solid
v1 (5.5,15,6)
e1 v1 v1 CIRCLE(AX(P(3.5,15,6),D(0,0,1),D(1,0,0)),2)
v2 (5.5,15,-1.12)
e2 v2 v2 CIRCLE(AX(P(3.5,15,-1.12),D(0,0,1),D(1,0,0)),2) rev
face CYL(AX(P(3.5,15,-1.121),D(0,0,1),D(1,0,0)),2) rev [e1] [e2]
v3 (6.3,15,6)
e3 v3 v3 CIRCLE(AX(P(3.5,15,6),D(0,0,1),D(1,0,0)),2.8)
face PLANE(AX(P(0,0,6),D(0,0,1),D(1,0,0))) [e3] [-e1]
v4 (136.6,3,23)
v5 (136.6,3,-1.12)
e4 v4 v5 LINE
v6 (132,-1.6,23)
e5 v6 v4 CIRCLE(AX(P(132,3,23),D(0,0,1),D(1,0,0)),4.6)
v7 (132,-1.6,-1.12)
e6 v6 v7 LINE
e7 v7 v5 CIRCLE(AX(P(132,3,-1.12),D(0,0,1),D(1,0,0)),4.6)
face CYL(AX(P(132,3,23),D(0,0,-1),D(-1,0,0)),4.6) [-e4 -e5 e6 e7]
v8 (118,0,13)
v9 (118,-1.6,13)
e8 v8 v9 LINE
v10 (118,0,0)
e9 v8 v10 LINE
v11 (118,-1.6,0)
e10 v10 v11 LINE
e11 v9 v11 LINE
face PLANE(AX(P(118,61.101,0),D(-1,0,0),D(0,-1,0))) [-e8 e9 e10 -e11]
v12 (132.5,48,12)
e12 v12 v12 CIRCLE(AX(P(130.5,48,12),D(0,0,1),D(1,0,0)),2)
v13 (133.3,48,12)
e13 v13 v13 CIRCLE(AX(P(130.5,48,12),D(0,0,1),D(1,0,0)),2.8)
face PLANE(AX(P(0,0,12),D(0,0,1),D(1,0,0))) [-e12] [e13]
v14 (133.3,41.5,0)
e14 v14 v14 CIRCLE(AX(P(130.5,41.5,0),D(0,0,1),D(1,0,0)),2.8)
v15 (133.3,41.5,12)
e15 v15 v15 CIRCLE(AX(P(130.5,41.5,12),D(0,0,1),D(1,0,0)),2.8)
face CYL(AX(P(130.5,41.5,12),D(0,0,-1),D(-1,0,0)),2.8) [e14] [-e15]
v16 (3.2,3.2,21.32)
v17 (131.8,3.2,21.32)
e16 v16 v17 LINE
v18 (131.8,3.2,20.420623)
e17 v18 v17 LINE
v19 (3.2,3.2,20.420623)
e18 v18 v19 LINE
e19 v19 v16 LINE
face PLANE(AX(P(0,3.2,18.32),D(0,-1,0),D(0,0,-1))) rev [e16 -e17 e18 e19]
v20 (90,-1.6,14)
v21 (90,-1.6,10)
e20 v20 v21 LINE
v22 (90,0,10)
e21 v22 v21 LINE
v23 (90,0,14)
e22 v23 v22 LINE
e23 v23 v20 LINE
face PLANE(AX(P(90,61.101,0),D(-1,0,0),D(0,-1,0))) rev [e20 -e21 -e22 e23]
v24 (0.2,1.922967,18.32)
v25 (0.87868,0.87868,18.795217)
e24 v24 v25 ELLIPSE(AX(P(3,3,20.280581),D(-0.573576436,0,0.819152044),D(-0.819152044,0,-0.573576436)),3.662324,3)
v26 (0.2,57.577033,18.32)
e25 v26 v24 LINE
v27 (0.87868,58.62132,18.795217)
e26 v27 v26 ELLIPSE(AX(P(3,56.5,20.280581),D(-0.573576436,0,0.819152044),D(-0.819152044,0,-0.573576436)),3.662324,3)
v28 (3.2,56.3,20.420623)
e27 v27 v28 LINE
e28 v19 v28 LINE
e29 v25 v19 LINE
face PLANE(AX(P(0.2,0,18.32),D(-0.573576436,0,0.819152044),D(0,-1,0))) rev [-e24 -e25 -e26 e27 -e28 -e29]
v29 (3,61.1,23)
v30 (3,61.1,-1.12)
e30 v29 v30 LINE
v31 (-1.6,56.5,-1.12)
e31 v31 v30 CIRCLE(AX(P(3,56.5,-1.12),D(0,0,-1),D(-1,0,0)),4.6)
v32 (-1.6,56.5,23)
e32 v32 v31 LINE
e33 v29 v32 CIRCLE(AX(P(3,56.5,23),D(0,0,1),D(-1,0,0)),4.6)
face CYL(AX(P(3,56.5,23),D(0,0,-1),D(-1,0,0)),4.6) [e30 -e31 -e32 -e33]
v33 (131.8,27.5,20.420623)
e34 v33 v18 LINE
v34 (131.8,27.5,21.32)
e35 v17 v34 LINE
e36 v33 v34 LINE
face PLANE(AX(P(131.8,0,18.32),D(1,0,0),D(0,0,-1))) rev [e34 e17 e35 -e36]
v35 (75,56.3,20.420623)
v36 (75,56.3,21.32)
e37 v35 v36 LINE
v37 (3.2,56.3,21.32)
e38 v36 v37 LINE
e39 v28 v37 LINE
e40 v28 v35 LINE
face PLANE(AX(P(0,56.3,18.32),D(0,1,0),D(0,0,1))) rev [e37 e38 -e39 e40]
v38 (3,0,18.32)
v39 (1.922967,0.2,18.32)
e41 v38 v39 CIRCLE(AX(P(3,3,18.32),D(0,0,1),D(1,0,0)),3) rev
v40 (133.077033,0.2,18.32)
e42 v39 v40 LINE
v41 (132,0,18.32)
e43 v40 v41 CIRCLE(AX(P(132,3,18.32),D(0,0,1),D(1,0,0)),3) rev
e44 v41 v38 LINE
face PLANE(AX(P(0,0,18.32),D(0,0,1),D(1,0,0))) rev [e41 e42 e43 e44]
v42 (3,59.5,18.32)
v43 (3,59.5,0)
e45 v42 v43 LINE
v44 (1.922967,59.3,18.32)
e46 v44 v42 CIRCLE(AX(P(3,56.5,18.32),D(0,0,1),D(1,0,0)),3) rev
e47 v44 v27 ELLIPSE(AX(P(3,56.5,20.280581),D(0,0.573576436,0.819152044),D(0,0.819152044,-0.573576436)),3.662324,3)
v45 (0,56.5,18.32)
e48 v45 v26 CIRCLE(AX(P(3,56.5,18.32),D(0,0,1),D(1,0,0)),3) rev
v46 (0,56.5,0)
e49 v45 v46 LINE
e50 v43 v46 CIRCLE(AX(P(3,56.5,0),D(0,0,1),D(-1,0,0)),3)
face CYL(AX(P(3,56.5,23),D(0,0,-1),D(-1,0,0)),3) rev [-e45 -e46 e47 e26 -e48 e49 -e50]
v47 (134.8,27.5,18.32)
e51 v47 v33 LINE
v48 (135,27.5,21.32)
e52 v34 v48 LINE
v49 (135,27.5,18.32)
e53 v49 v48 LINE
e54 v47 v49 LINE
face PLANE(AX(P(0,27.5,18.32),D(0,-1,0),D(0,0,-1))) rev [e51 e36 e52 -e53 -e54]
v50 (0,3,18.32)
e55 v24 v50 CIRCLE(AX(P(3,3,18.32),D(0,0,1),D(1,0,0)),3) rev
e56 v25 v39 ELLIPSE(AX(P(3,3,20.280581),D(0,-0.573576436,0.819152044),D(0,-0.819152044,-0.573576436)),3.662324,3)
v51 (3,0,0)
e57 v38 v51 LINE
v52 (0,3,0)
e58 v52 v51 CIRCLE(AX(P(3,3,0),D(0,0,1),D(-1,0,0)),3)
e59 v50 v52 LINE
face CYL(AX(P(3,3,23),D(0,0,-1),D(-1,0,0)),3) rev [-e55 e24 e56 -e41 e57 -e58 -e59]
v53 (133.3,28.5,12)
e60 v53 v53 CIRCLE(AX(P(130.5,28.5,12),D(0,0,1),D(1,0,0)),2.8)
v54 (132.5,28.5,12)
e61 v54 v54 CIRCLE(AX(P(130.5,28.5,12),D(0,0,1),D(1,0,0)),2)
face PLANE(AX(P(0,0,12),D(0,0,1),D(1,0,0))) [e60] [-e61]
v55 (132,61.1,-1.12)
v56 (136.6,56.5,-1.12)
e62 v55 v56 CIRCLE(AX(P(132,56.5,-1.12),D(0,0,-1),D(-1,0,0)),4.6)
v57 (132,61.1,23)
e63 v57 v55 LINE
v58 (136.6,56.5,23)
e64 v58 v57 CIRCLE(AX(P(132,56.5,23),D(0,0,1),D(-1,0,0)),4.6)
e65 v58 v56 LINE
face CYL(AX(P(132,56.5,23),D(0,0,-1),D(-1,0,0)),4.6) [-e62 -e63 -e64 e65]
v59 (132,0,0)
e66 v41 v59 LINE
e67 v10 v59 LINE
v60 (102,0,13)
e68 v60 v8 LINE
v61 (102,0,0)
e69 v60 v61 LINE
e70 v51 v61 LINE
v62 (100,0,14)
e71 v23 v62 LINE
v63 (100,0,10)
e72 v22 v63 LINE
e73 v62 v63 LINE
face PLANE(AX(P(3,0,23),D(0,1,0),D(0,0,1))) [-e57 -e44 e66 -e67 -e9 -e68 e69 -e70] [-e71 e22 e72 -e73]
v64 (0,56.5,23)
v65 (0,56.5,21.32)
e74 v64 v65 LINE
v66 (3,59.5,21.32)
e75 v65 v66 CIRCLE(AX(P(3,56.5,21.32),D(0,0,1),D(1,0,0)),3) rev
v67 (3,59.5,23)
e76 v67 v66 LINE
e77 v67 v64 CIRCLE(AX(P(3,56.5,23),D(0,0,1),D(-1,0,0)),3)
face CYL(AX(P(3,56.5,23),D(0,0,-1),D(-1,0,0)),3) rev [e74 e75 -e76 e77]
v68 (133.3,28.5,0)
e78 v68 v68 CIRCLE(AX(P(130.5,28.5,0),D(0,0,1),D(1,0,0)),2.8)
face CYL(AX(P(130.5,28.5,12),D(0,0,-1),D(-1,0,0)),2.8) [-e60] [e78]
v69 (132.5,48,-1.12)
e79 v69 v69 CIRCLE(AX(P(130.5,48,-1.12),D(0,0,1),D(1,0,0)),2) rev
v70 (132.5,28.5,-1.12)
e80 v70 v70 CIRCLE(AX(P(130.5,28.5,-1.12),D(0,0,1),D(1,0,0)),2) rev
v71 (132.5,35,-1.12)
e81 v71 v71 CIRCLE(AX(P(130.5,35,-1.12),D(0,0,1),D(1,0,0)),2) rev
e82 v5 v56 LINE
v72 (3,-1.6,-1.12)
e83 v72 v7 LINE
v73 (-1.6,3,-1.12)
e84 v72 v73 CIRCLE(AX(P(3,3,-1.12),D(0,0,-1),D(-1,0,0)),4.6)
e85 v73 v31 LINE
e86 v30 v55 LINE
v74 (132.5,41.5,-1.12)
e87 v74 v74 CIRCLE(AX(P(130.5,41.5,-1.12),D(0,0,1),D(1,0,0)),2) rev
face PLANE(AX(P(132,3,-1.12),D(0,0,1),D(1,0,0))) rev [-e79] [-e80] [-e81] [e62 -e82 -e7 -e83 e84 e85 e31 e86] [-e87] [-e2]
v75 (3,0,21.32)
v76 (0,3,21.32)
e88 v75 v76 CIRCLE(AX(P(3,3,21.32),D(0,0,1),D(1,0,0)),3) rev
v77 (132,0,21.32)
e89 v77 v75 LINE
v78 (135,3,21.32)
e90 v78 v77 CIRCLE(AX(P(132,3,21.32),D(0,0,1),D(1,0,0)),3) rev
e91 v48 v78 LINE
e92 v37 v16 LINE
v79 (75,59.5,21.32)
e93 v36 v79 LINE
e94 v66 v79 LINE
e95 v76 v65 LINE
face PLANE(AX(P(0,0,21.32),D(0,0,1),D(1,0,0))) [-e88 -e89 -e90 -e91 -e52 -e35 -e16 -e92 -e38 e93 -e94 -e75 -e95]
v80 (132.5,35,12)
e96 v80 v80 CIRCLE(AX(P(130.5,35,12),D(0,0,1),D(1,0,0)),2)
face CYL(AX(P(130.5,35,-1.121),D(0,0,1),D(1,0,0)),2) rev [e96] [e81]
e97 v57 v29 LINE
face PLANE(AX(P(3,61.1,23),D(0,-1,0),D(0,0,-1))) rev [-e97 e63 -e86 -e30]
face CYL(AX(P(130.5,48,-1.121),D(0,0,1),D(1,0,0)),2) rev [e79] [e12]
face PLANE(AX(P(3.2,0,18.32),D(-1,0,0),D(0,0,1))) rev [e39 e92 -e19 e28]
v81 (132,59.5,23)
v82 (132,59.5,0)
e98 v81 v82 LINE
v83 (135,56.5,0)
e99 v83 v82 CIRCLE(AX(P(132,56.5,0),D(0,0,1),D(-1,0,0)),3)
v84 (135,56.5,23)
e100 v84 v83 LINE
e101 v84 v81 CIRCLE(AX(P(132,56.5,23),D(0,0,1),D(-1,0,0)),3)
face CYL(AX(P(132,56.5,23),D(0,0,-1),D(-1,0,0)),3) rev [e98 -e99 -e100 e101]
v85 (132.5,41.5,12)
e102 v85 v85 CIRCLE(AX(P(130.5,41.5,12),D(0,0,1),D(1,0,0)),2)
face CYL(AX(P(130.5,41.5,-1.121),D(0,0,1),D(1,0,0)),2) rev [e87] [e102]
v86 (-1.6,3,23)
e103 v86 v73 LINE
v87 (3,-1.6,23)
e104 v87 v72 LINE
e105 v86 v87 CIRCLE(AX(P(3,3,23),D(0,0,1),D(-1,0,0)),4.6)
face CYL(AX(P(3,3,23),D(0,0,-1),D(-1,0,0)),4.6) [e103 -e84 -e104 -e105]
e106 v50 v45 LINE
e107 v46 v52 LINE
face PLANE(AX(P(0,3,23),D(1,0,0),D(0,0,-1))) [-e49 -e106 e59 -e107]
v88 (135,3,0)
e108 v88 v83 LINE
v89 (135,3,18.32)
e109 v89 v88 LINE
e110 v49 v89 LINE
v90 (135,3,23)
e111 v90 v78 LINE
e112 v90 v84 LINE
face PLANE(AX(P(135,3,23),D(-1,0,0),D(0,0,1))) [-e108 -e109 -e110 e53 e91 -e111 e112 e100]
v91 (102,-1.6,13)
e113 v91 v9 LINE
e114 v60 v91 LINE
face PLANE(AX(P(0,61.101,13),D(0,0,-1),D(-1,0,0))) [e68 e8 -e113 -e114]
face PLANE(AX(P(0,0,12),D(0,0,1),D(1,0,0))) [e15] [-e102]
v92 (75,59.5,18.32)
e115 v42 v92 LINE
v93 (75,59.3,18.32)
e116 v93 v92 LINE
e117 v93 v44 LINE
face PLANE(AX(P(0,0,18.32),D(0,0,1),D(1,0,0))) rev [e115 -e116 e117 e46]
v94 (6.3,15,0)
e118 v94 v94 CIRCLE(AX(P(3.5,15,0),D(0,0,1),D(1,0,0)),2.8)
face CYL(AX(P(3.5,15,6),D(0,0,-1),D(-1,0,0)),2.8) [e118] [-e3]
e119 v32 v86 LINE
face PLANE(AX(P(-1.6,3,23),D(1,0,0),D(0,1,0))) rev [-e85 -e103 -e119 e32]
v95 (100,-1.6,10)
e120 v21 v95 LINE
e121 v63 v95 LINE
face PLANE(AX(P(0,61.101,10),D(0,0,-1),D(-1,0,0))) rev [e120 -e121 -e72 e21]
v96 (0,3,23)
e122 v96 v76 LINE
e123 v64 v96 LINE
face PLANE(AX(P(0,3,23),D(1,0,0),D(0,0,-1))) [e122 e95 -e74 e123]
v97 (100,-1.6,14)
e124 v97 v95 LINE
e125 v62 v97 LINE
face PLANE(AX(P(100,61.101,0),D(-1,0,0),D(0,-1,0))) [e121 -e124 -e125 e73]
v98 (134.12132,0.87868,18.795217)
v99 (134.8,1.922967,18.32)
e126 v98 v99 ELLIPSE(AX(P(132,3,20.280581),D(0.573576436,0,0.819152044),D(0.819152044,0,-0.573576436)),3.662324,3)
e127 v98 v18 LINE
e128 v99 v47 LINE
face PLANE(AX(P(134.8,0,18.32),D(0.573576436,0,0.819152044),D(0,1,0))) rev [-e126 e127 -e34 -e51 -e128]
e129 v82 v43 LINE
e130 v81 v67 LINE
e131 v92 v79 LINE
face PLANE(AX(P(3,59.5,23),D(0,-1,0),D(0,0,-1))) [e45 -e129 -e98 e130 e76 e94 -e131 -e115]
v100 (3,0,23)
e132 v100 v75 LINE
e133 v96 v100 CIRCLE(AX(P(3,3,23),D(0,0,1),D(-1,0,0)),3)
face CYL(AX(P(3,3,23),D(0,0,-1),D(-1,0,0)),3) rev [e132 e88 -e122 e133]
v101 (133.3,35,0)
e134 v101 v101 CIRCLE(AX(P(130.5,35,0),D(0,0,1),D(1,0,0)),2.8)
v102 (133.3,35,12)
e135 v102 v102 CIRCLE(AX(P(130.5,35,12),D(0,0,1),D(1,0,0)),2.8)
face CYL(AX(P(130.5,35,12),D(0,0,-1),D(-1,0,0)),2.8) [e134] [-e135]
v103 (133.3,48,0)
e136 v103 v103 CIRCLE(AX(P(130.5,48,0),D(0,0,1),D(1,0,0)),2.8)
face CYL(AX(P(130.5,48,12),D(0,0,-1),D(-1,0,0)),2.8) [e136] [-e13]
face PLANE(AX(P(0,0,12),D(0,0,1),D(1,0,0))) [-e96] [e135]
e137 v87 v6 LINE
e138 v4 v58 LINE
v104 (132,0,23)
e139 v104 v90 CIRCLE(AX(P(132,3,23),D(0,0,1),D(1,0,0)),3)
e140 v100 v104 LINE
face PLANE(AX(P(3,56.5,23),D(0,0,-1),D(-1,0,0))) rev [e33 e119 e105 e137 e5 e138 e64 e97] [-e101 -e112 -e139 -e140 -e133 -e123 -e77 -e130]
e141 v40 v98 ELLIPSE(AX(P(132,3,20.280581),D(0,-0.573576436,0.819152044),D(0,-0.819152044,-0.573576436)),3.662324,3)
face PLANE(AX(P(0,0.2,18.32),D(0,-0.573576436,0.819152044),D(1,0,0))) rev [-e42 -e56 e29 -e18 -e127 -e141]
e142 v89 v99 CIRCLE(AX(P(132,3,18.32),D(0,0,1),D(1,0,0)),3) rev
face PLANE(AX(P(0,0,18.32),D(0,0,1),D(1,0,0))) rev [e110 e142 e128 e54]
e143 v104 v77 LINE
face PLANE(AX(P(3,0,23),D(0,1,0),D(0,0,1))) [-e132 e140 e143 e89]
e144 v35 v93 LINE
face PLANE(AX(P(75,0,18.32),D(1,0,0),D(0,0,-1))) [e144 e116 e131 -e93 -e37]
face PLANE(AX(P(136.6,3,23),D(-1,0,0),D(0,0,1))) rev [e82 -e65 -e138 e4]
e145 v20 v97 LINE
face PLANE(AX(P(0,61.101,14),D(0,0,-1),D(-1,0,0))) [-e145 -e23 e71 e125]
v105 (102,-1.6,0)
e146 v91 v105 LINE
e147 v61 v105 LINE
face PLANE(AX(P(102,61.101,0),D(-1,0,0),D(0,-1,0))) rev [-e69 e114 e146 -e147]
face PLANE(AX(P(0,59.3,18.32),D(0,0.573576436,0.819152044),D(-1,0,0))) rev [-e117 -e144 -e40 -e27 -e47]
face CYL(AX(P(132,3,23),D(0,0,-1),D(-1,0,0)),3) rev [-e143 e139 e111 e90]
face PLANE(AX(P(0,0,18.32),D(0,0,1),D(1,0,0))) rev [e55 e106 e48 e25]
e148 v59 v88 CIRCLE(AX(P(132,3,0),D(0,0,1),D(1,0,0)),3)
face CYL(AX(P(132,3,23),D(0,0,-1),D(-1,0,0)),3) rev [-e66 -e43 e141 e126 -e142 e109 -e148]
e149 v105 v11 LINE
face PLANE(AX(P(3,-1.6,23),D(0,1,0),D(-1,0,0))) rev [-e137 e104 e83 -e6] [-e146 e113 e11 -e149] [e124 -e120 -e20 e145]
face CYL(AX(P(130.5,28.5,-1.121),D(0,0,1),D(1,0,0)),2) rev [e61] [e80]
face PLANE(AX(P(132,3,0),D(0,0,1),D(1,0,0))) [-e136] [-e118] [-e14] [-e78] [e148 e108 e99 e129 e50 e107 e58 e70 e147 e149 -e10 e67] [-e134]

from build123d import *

# Parameters (mm, degrees)
PARED_DEPTH             = 23
CONECTORES_REACH        = 154.052
CROQUIS2_W              = 16
CROQUIS2_H              = 13
CROQUIS2_W_2            = 10
CROQUIS2_H_2            = 4
BASE_START              = -1.12
BASE_FRENTE_DEPTH       = 1.12
LUCES_REACH             = 153.399
CROQUIS3_R              = 2
SALIENTE_EXTRUIR1_START = 12
CROQUIS3_3_R            = 2.8
CROQUIS3_3_R_2          = 2
SALIENTE_EXTRUIR1_DEPTH = 12
SALIENTE_EXTRUIR3_START = 6
CROQUIS3_5_R            = 2.8
CROQUIS3_5_R_2          = 2
SALIENTE_EXTRUIR3_DEPTH = 6
SALIENTE_EXTRUIR4_START = -4.68
SALIENTE_EXTRUIR4_DEPTH = 3


with BuildPart() as part:
    # Croquis1 → pared (new body)
    with BuildSketch(Plane.XY):
        with BuildLine():
            Line((3, 61.1), (132, 61.1))
            ThreePointArc((132, 61.1), (135.252691193, 59.752691193), (136.6, 56.5))
            Line((136.6, 56.5), (136.6, 3))
            ThreePointArc((136.6, 3), (135.252691193, -0.252691193), (132, -1.6))
            Line((132, -1.6), (3, -1.6))
            ThreePointArc((3, -1.6), (-0.252691193, -0.252691193), (-1.6, 3))
            Line((-1.6, 3), (-1.6, 56.5))
            ThreePointArc((-1.6, 56.5), (-0.252691193, 59.752691193), (3, 61.1))
        make_face()
        with BuildLine():
            Line((3, 0), (132, 0))
            ThreePointArc((132, 0), (134.121320344, 0.878679656), (135, 3))
            Line((135, 3), (135, 56.5))
            ThreePointArc((135, 56.5), (134.121320344, 58.621320344), (132, 59.5))
            Line((132, 59.5), (3, 59.5))
            ThreePointArc((3, 59.5), (0.878679656, 58.621320344), (0, 56.5))
            Line((0, 56.5), (0, 3))
            ThreePointArc((0, 3), (0.878679656, 0.878679656), (3, 0))
        make_face(mode=Mode.SUBTRACT)
    extrude(amount=PARED_DEPTH)

    # Croquis2 → conectores (cut, up to next)
    with BuildSketch(Plane.XZ.offset(1.6), mode=Mode.PRIVATE) as conectores_sk1:
        with Locations((110, 6.5)):
            Rectangle(CROQUIS2_W, CROQUIS2_H)
    conectores_tool1 = extrude(conectores_sk1.sketch, amount=-CONECTORES_REACH, mode=Mode.PRIVATE) & part.part
    # Croquis2 → conectores (cut, up to next)
    with BuildSketch(Plane.XZ.offset(1.6), mode=Mode.PRIVATE) as conectores_sk2:
        with Locations((95, 12)):
            Rectangle(CROQUIS2_W_2, CROQUIS2_H_2)
    conectores_tool2 = extrude(conectores_sk2.sketch, amount=-CONECTORES_REACH, mode=Mode.PRIVATE) & part.part
    add(conectores_tool1.solids().sort_by_distance((110, -1.6, 6.5))[0], mode=Mode.SUBTRACT)
    add(conectores_tool2.solids().sort_by_distance((95, -1.6, 12))[0], mode=Mode.SUBTRACT)

    # Croquis1<2> → base frente (add)
    with BuildSketch(Plane.XY.offset(BASE_START)):
        with BuildLine():
            Line((3, 61.1), (132, 61.1))
            ThreePointArc((132, 61.1), (135.252691193, 59.752691193), (136.6, 56.5))
            Line((136.6, 56.5), (136.6, 3))
            ThreePointArc((136.6, 3), (135.252691193, -0.252691193), (132, -1.6))
            Line((132, -1.6), (3, -1.6))
            ThreePointArc((3, -1.6), (-0.252691193, -0.252691193), (-1.6, 3))
            Line((-1.6, 3), (-1.6, 56.5))
            ThreePointArc((-1.6, 56.5), (-0.252691193, 59.752691193), (3, 61.1))
        make_face()
    extrude(amount=BASE_FRENTE_DEPTH)

    # Croquis3 → luces (cut, up to next)
    with BuildSketch(Plane.XY, mode=Mode.PRIVATE) as luces_sk1:
        with Locations((130.5, 48)):
            Circle(CROQUIS3_R)
    luces_tool1 = extrude(luces_sk1.sketch, amount=-LUCES_REACH, mode=Mode.PRIVATE) & part.part
    # Croquis3 → luces (cut, up to next)
    with BuildSketch(Plane.XY, mode=Mode.PRIVATE) as luces_sk2:
        with Locations((130.5, 41.5)):
            Circle(CROQUIS3_R)
    luces_tool2 = extrude(luces_sk2.sketch, amount=-LUCES_REACH, mode=Mode.PRIVATE) & part.part
    # Croquis3 → luces (cut, up to next)
    with BuildSketch(Plane.XY, mode=Mode.PRIVATE) as luces_sk3:
        with Locations((130.5, 35)):
            Circle(CROQUIS3_R)
    luces_tool3 = extrude(luces_sk3.sketch, amount=-LUCES_REACH, mode=Mode.PRIVATE) & part.part
    # Croquis3 → luces (cut, up to next)
    with BuildSketch(Plane.XY, mode=Mode.PRIVATE) as luces_sk4:
        with Locations((130.5, 28.5)):
            Circle(CROQUIS3_R)
    luces_tool4 = extrude(luces_sk4.sketch, amount=-LUCES_REACH, mode=Mode.PRIVATE) & part.part
    # Croquis3 → luces (cut, up to next)
    with BuildSketch(Plane.XY, mode=Mode.PRIVATE) as luces_sk5:
        with Locations((3.5, 15)):
            Circle(CROQUIS3_R)
    luces_tool5 = extrude(luces_sk5.sketch, amount=-LUCES_REACH, mode=Mode.PRIVATE) & part.part
    add(luces_tool1.solids().sort_by_distance((130.5, 48, 0))[0], mode=Mode.SUBTRACT)
    add(luces_tool2.solids().sort_by_distance((130.5, 41.5, 0))[0], mode=Mode.SUBTRACT)
    add(luces_tool3.solids().sort_by_distance((130.5, 35, 0))[0], mode=Mode.SUBTRACT)
    add(luces_tool4.solids().sort_by_distance((130.5, 28.5, 0))[0], mode=Mode.SUBTRACT)
    add(luces_tool5.solids().sort_by_distance((3.5, 15, 0))[0], mode=Mode.SUBTRACT)

    # Croquis3<3> → Saliente-Extruir1 (add)
    # profile 1 of 4: a face of its own
    with BuildSketch(Plane.XY.offset(SALIENTE_EXTRUIR1_START)):
        with Locations((130.5, 28.5)):
            Circle(CROQUIS3_3_R)
        with Locations((130.5, 28.5)):
            Circle(CROQUIS3_3_R_2, mode=Mode.SUBTRACT)
    # profile 2 of 4: a face of its own
    with BuildSketch(Plane.XY.offset(SALIENTE_EXTRUIR1_START)):
        with Locations((130.5, 35)):
            Circle(CROQUIS3_3_R)
        with Locations((130.5, 35)):
            Circle(CROQUIS3_3_R_2, mode=Mode.SUBTRACT)
    # profile 3 of 4: a face of its own
    with BuildSketch(Plane.XY.offset(SALIENTE_EXTRUIR1_START)):
        with Locations((130.5, 41.5)):
            Circle(CROQUIS3_3_R)
        with Locations((130.5, 41.5)):
            Circle(CROQUIS3_3_R_2, mode=Mode.SUBTRACT)
    # profile 4 of 4: a face of its own
    with BuildSketch(Plane.XY.offset(SALIENTE_EXTRUIR1_START)):
        with Locations((130.5, 48)):
            Circle(CROQUIS3_3_R)
        with Locations((130.5, 48)):
            Circle(CROQUIS3_3_R_2, mode=Mode.SUBTRACT)
    extrude(amount=-SALIENTE_EXTRUIR1_DEPTH)

    # Croquis3<5> → Saliente-Extruir3 (add)
    with BuildSketch(Plane.XY.offset(SALIENTE_EXTRUIR3_START)):
        with Locations((3.5, 15)):
            Circle(CROQUIS3_5_R)
        with Locations((3.5, 15)):
            Circle(CROQUIS3_5_R_2, mode=Mode.SUBTRACT)
    extrude(amount=-SALIENTE_EXTRUIR3_DEPTH)

    # Croquis5 → Saliente-Extruir4 (add)
    with BuildSketch(Plane.XY.offset(23).offset(SALIENTE_EXTRUIR4_START)):
        with BuildLine():
            ThreePointArc((3, 59.5), (0.878679656, 58.621320344), (0, 56.5))
            Line((0, 56.5), (0, 3))
            ThreePointArc((0, 3), (0.878679656, 0.878679656), (3, 0))
            Line((3, 0), (132, 0))
            ThreePointArc((132, 0), (134.121320344, 0.878679656), (135, 3))
            Line((135, 3), (135, 27.5))
            Line((135, 27.5), (131.8, 27.5))
            Line((131.8, 27.5), (131.8, 3.2))
            Line((131.8, 3.2), (3.2, 3.2))
            Line((3.2, 3.2), (3.2, 56.3))
            Line((3.2, 56.3), (75, 56.3))
            Line((75, 56.3), (75, 59.5))
            Line((75, 59.5), (3, 59.5))
        make_face()
    extrude(amount=SALIENTE_EXTRUIR4_DEPTH)

    # Chaflán1
    # the kernel refuses this chamfer: 3, 2.100622615 mm, written as the material it takes off along each edge
    with BuildSketch(Plane(origin=(3.2, 56.3, 18.32), x_dir=(0, 0.9997533347641299, -0.022209674198456996), z_dir=(1, 0, 0))) as chafl_n1_piece_1:
        with BuildLine():
            Line((3.099062676, 0), (-0.146456816, 2.166733487))
            Line((-0.146456816, 2.166733487), (-0.206442016, 2.165400906))
            ThreePointArc((-0.206442016, 2.165400906), (-0.084076609, 1.083125749), (-0.0599852, -0.00133258))
            Line((-0.0599852, -0.00133258), (0.00133258, -0.0599852))
            ThreePointArc((0.00133258, -0.0599852), (1.550099582, -0.025579103), (3.100395257, -0.0599852))
            Line((3.100395257, -0.0599852), (3.099062676, 0))
        make_face()
    extrude(amount=71.8, mode=Mode.SUBTRACT)
    with BuildSketch(Plane(origin=(3.2, 3.2, 18.32), x_dir=(-0.9997533347641299, 0, -0.02220967419845701), z_dir=(0, 1, 0))) as chafl_n1_piece_2:
        with BuildLine():
            Line((3.099062676, 0), (-0.146456816, 2.166733487))
            Line((-0.146456816, 2.166733487), (-0.206442016, 2.165400906))
            ThreePointArc((-0.206442016, 2.165400906), (-0.084076609, 1.083125749), (-0.0599852, -0.00133258))
            Line((-0.0599852, -0.00133258), (0.00133258, -0.0599852))
            ThreePointArc((0.00133258, -0.0599852), (1.550099582, -0.025579103), (3.100395257, -0.0599852))
            Line((3.100395257, -0.0599852), (3.099062676, 0))
        make_face()
    extrude(amount=53.1, mode=Mode.SUBTRACT)
    with BuildSketch(Plane(origin=(131.8, 3.2, 18.32), x_dir=(0, -0.99975333476413, -0.022209674198457003), z_dir=(-1, 0, 0))) as chafl_n1_piece_3:
        with BuildLine():
            Line((3.099062676, 0), (-0.146456816, 2.166733487))
            Line((-0.146456816, 2.166733487), (-0.206442016, 2.165400906))
            ThreePointArc((-0.206442016, 2.165400906), (-0.084076609, 1.083125749), (-0.0599852, -0.00133258))
            Line((-0.0599852, -0.00133258), (0.00133258, -0.0599852))
            ThreePointArc((0.00133258, -0.0599852), (1.550099582, -0.025579103), (3.100395257, -0.0599852))
            Line((3.100395257, -0.0599852), (3.099062676, 0))
        make_face()
    extrude(amount=128.6, mode=Mode.SUBTRACT)
    with BuildSketch(Plane(origin=(131.8, 27.5, 18.32), x_dir=(0.9997533347641299, 0, -0.022209674198456996), z_dir=(0, -1, 0))) as chafl_n1_piece_4:
        with BuildLine():
            Line((3.099062676, 0), (-0.146456816, 2.166733487))
            Line((-0.146456816, 2.166733487), (-0.206442016, 2.165400906))
            ThreePointArc((-0.206442016, 2.165400906), (-0.084076609, 1.083125749), (-0.0599852, -0.00133258))
            Line((-0.0599852, -0.00133258), (0.00133258, -0.0599852))
            ThreePointArc((0.00133258, -0.0599852), (1.550099582, -0.025579103), (3.100395257, -0.0599852))
            Line((3.100395257, -0.0599852), (3.099062676, 0))
        make_face()
    extrude(amount=24.3, mode=Mode.SUBTRACT)
    with BuildSketch(Plane(origin=(3.2, 3.2, 18.32), x_dir=(-0.9997533347641299, 0, -0.02220967419845701), z_dir=(0, 1, 0))) as chafl_n1_piece_5a_section:
        with BuildLine():
            Line((3.099062676, 0), (-0.146456816, 2.166733487))
            Line((-0.146456816, 2.166733487), (-0.206442016, 2.165400906))
            ThreePointArc((-0.206442016, 2.165400906), (-0.084076609, 1.083125749), (-0.0599852, -0.00133258))
            Line((-0.0599852, -0.00133258), (0.00133258, -0.0599852))
            ThreePointArc((0.00133258, -0.0599852), (1.550099582, -0.025579103), (3.100395257, -0.0599852))
            Line((3.100395257, -0.0599852), (3.099062676, 0))
        make_face()
    chafl_n1_piece_5a = extrude(amount=60.847656691, mode=Mode.PRIVATE)
    chafl_n1_piece_5a = chafl_n1_piece_5a & Plane(origin=(3, 56.5, 19.031713665), x_dir=(0, 1, 0), z_dir=(0, 0, -1)) * Cylinder(3, 135, mode=Mode.PRIVATE)
    chafl_n1_piece_5a = split(chafl_n1_piece_5a, bisect_by=Plane(origin=(2.281590603, 56.3, 19.031713665), z_dir=(0, 1, 0)), keep=Keep.TOP, mode=Mode.PRIVATE)
    with BuildSketch(Plane(origin=(-4.547656691, 56.3, 18.32), x_dir=(0, 0.9997533347641299, -0.022209674198456996), z_dir=(1, 0, 0))) as chafl_n1_piece_5b_section:
        with BuildLine():
            Line((3.099062676, 0), (-0.146456816, 2.166733487))
            Line((-0.146456816, 2.166733487), (-0.206442016, 2.165400906))
            ThreePointArc((-0.206442016, 2.165400906), (-0.084076609, 1.083125749), (-0.0599852, -0.00133258))
            Line((-0.0599852, -0.00133258), (0.00133258, -0.0599852))
            ThreePointArc((0.00133258, -0.0599852), (1.550099582, -0.025579103), (3.100395257, -0.0599852))
            Line((3.100395257, -0.0599852), (3.099062676, 0))
        make_face()
    chafl_n1_piece_5b = extrude(amount=79.547656691, mode=Mode.PRIVATE)
    chafl_n1_piece_5b = chafl_n1_piece_5b & Plane(origin=(3, 56.5, 19.03171372), x_dir=(0, 1, 0), z_dir=(0, 0, -1)) * Cylinder(3, 172, mode=Mode.PRIVATE)
    chafl_n1_piece_5b = split(chafl_n1_piece_5b, bisect_by=Plane(origin=(3.2, 57.218409394, 19.03171372), z_dir=(-1, 0, 0)), keep=Keep.TOP, mode=Mode.PRIVATE)
    chafl_n1_piece_5 = chafl_n1_piece_5a & chafl_n1_piece_5b
    add(chafl_n1_piece_5, mode=Mode.SUBTRACT)
    with BuildSketch(Plane(origin=(131.8, 3.2, 18.32), x_dir=(0, -0.99975333476413, -0.022209674198457003), z_dir=(-1, 0, 0))) as chafl_n1_piece_6a_section:
        with BuildLine():
            Line((3.099062676, 0), (-0.146456816, 2.166733487))
            Line((-0.146456816, 2.166733487), (-0.206442016, 2.165400906))
            ThreePointArc((-0.206442016, 2.165400906), (-0.084076609, 1.083125749), (-0.0599852, -0.00133258))
            Line((-0.0599852, -0.00133258), (0.00133258, -0.0599852))
            ThreePointArc((0.00133258, -0.0599852), (1.550099582, -0.025579103), (3.100395257, -0.0599852))
            Line((3.100395257, -0.0599852), (3.099062676, 0))
        make_face()
    chafl_n1_piece_6a = extrude(amount=136.347656691, mode=Mode.PRIVATE)
    chafl_n1_piece_6a = chafl_n1_piece_6a & Plane(origin=(3, 3, 19.031713665), x_dir=(-1, 0, 0), z_dir=(0, 0, -1)) * Cylinder(3, 286, mode=Mode.PRIVATE)
    chafl_n1_piece_6a = split(chafl_n1_piece_6a, bisect_by=Plane(origin=(3.2, 2.281590603, 19.031713665), z_dir=(-1, 0, 0)), keep=Keep.TOP, mode=Mode.PRIVATE)
    with BuildSketch(Plane(origin=(3.2, -4.547656691, 18.32), x_dir=(-0.99975333476413, 0, -0.02220967419845701), z_dir=(0, 1, 0))) as chafl_n1_piece_6b_section:
        with BuildLine():
            Line((3.099062676, 0), (-0.146456816, 2.166733487))
            Line((-0.146456816, 2.166733487), (-0.206442016, 2.165400906))
            ThreePointArc((-0.206442016, 2.165400906), (-0.084076609, 1.083125749), (-0.0599852, -0.00133258))
            Line((-0.0599852, -0.00133258), (0.00133258, -0.0599852))
            ThreePointArc((0.00133258, -0.0599852), (1.550099582, -0.025579103), (3.100395257, -0.0599852))
            Line((3.100395257, -0.0599852), (3.099062676, 0))
        make_face()
    chafl_n1_piece_6b = extrude(amount=60.847656691, mode=Mode.PRIVATE)
    chafl_n1_piece_6b = chafl_n1_piece_6b & Plane(origin=(3, 3, 19.03171372), x_dir=(-1, 0, 0), z_dir=(0, 0, -1)) * Cylinder(3, 135, mode=Mode.PRIVATE)
    chafl_n1_piece_6b = split(chafl_n1_piece_6b, bisect_by=Plane(origin=(2.281590606, 3.2, 19.03171372), z_dir=(0, -1, 0)), keep=Keep.TOP, mode=Mode.PRIVATE)
    chafl_n1_piece_6 = chafl_n1_piece_6a & chafl_n1_piece_6b
    add(chafl_n1_piece_6, mode=Mode.SUBTRACT)
    with BuildSketch(Plane(origin=(131.8, 27.5, 18.32), x_dir=(0.9997533347641299, 0, -0.022209674198456996), z_dir=(0, -1, 0))) as chafl_n1_piece_7a_section:
        with BuildLine():
            Line((3.099062676, 0), (-0.146456816, 2.166733487))
            Line((-0.146456816, 2.166733487), (-0.206442016, 2.165400906))
            ThreePointArc((-0.206442016, 2.165400906), (-0.084076609, 1.083125749), (-0.0599852, -0.00133258))
            Line((-0.0599852, -0.00133258), (0.00133258, -0.0599852))
            ThreePointArc((0.00133258, -0.0599852), (1.550099582, -0.025579103), (3.100395257, -0.0599852))
            Line((3.100395257, -0.0599852), (3.099062676, 0))
        make_face()
    chafl_n1_piece_7a = extrude(amount=32.047656691, mode=Mode.PRIVATE)
    chafl_n1_piece_7a = chafl_n1_piece_7a & Plane(origin=(132, 3, 19.031713665), x_dir=(0, -1, 0), z_dir=(0, 0, -1)) * Cylinder(3, 77, mode=Mode.PRIVATE)
    chafl_n1_piece_7a = split(chafl_n1_piece_7a, bisect_by=Plane(origin=(132.718409397, 3.2, 19.031713665), z_dir=(0, -1, 0)), keep=Keep.TOP, mode=Mode.PRIVATE)
    with BuildSketch(Plane(origin=(139.547656691, 3.2, 18.32), x_dir=(0, -0.99975333476413, -0.02220967419845701), z_dir=(-1, 0, 0))) as chafl_n1_piece_7b_section:
        with BuildLine():
            Line((3.099062676, 0), (-0.146456816, 2.166733487))
            Line((-0.146456816, 2.166733487), (-0.206442016, 2.165400906))
            ThreePointArc((-0.206442016, 2.165400906), (-0.084076609, 1.083125749), (-0.0599852, -0.00133258))
            Line((-0.0599852, -0.00133258), (0.00133258, -0.0599852))
            ThreePointArc((0.00133258, -0.0599852), (1.550099582, -0.025579103), (3.100395257, -0.0599852))
            Line((3.100395257, -0.0599852), (3.099062676, 0))
        make_face()
    chafl_n1_piece_7b = extrude(amount=136.347656691, mode=Mode.PRIVATE)
    chafl_n1_piece_7b = chafl_n1_piece_7b & Plane(origin=(132, 3, 19.03171372), x_dir=(0, -1, 0), z_dir=(0, 0, -1)) * Cylinder(3, 286, mode=Mode.PRIVATE)
    chafl_n1_piece_7b = split(chafl_n1_piece_7b, bisect_by=Plane(origin=(131.8, 2.281590606, 19.03171372), z_dir=(1, 0, 0)), keep=Keep.TOP, mode=Mode.PRIVATE)
    chafl_n1_piece_7 = chafl_n1_piece_7a & chafl_n1_piece_7b
    add(chafl_n1_piece_7, mode=Mode.SUBTRACT)


solid = part.part
